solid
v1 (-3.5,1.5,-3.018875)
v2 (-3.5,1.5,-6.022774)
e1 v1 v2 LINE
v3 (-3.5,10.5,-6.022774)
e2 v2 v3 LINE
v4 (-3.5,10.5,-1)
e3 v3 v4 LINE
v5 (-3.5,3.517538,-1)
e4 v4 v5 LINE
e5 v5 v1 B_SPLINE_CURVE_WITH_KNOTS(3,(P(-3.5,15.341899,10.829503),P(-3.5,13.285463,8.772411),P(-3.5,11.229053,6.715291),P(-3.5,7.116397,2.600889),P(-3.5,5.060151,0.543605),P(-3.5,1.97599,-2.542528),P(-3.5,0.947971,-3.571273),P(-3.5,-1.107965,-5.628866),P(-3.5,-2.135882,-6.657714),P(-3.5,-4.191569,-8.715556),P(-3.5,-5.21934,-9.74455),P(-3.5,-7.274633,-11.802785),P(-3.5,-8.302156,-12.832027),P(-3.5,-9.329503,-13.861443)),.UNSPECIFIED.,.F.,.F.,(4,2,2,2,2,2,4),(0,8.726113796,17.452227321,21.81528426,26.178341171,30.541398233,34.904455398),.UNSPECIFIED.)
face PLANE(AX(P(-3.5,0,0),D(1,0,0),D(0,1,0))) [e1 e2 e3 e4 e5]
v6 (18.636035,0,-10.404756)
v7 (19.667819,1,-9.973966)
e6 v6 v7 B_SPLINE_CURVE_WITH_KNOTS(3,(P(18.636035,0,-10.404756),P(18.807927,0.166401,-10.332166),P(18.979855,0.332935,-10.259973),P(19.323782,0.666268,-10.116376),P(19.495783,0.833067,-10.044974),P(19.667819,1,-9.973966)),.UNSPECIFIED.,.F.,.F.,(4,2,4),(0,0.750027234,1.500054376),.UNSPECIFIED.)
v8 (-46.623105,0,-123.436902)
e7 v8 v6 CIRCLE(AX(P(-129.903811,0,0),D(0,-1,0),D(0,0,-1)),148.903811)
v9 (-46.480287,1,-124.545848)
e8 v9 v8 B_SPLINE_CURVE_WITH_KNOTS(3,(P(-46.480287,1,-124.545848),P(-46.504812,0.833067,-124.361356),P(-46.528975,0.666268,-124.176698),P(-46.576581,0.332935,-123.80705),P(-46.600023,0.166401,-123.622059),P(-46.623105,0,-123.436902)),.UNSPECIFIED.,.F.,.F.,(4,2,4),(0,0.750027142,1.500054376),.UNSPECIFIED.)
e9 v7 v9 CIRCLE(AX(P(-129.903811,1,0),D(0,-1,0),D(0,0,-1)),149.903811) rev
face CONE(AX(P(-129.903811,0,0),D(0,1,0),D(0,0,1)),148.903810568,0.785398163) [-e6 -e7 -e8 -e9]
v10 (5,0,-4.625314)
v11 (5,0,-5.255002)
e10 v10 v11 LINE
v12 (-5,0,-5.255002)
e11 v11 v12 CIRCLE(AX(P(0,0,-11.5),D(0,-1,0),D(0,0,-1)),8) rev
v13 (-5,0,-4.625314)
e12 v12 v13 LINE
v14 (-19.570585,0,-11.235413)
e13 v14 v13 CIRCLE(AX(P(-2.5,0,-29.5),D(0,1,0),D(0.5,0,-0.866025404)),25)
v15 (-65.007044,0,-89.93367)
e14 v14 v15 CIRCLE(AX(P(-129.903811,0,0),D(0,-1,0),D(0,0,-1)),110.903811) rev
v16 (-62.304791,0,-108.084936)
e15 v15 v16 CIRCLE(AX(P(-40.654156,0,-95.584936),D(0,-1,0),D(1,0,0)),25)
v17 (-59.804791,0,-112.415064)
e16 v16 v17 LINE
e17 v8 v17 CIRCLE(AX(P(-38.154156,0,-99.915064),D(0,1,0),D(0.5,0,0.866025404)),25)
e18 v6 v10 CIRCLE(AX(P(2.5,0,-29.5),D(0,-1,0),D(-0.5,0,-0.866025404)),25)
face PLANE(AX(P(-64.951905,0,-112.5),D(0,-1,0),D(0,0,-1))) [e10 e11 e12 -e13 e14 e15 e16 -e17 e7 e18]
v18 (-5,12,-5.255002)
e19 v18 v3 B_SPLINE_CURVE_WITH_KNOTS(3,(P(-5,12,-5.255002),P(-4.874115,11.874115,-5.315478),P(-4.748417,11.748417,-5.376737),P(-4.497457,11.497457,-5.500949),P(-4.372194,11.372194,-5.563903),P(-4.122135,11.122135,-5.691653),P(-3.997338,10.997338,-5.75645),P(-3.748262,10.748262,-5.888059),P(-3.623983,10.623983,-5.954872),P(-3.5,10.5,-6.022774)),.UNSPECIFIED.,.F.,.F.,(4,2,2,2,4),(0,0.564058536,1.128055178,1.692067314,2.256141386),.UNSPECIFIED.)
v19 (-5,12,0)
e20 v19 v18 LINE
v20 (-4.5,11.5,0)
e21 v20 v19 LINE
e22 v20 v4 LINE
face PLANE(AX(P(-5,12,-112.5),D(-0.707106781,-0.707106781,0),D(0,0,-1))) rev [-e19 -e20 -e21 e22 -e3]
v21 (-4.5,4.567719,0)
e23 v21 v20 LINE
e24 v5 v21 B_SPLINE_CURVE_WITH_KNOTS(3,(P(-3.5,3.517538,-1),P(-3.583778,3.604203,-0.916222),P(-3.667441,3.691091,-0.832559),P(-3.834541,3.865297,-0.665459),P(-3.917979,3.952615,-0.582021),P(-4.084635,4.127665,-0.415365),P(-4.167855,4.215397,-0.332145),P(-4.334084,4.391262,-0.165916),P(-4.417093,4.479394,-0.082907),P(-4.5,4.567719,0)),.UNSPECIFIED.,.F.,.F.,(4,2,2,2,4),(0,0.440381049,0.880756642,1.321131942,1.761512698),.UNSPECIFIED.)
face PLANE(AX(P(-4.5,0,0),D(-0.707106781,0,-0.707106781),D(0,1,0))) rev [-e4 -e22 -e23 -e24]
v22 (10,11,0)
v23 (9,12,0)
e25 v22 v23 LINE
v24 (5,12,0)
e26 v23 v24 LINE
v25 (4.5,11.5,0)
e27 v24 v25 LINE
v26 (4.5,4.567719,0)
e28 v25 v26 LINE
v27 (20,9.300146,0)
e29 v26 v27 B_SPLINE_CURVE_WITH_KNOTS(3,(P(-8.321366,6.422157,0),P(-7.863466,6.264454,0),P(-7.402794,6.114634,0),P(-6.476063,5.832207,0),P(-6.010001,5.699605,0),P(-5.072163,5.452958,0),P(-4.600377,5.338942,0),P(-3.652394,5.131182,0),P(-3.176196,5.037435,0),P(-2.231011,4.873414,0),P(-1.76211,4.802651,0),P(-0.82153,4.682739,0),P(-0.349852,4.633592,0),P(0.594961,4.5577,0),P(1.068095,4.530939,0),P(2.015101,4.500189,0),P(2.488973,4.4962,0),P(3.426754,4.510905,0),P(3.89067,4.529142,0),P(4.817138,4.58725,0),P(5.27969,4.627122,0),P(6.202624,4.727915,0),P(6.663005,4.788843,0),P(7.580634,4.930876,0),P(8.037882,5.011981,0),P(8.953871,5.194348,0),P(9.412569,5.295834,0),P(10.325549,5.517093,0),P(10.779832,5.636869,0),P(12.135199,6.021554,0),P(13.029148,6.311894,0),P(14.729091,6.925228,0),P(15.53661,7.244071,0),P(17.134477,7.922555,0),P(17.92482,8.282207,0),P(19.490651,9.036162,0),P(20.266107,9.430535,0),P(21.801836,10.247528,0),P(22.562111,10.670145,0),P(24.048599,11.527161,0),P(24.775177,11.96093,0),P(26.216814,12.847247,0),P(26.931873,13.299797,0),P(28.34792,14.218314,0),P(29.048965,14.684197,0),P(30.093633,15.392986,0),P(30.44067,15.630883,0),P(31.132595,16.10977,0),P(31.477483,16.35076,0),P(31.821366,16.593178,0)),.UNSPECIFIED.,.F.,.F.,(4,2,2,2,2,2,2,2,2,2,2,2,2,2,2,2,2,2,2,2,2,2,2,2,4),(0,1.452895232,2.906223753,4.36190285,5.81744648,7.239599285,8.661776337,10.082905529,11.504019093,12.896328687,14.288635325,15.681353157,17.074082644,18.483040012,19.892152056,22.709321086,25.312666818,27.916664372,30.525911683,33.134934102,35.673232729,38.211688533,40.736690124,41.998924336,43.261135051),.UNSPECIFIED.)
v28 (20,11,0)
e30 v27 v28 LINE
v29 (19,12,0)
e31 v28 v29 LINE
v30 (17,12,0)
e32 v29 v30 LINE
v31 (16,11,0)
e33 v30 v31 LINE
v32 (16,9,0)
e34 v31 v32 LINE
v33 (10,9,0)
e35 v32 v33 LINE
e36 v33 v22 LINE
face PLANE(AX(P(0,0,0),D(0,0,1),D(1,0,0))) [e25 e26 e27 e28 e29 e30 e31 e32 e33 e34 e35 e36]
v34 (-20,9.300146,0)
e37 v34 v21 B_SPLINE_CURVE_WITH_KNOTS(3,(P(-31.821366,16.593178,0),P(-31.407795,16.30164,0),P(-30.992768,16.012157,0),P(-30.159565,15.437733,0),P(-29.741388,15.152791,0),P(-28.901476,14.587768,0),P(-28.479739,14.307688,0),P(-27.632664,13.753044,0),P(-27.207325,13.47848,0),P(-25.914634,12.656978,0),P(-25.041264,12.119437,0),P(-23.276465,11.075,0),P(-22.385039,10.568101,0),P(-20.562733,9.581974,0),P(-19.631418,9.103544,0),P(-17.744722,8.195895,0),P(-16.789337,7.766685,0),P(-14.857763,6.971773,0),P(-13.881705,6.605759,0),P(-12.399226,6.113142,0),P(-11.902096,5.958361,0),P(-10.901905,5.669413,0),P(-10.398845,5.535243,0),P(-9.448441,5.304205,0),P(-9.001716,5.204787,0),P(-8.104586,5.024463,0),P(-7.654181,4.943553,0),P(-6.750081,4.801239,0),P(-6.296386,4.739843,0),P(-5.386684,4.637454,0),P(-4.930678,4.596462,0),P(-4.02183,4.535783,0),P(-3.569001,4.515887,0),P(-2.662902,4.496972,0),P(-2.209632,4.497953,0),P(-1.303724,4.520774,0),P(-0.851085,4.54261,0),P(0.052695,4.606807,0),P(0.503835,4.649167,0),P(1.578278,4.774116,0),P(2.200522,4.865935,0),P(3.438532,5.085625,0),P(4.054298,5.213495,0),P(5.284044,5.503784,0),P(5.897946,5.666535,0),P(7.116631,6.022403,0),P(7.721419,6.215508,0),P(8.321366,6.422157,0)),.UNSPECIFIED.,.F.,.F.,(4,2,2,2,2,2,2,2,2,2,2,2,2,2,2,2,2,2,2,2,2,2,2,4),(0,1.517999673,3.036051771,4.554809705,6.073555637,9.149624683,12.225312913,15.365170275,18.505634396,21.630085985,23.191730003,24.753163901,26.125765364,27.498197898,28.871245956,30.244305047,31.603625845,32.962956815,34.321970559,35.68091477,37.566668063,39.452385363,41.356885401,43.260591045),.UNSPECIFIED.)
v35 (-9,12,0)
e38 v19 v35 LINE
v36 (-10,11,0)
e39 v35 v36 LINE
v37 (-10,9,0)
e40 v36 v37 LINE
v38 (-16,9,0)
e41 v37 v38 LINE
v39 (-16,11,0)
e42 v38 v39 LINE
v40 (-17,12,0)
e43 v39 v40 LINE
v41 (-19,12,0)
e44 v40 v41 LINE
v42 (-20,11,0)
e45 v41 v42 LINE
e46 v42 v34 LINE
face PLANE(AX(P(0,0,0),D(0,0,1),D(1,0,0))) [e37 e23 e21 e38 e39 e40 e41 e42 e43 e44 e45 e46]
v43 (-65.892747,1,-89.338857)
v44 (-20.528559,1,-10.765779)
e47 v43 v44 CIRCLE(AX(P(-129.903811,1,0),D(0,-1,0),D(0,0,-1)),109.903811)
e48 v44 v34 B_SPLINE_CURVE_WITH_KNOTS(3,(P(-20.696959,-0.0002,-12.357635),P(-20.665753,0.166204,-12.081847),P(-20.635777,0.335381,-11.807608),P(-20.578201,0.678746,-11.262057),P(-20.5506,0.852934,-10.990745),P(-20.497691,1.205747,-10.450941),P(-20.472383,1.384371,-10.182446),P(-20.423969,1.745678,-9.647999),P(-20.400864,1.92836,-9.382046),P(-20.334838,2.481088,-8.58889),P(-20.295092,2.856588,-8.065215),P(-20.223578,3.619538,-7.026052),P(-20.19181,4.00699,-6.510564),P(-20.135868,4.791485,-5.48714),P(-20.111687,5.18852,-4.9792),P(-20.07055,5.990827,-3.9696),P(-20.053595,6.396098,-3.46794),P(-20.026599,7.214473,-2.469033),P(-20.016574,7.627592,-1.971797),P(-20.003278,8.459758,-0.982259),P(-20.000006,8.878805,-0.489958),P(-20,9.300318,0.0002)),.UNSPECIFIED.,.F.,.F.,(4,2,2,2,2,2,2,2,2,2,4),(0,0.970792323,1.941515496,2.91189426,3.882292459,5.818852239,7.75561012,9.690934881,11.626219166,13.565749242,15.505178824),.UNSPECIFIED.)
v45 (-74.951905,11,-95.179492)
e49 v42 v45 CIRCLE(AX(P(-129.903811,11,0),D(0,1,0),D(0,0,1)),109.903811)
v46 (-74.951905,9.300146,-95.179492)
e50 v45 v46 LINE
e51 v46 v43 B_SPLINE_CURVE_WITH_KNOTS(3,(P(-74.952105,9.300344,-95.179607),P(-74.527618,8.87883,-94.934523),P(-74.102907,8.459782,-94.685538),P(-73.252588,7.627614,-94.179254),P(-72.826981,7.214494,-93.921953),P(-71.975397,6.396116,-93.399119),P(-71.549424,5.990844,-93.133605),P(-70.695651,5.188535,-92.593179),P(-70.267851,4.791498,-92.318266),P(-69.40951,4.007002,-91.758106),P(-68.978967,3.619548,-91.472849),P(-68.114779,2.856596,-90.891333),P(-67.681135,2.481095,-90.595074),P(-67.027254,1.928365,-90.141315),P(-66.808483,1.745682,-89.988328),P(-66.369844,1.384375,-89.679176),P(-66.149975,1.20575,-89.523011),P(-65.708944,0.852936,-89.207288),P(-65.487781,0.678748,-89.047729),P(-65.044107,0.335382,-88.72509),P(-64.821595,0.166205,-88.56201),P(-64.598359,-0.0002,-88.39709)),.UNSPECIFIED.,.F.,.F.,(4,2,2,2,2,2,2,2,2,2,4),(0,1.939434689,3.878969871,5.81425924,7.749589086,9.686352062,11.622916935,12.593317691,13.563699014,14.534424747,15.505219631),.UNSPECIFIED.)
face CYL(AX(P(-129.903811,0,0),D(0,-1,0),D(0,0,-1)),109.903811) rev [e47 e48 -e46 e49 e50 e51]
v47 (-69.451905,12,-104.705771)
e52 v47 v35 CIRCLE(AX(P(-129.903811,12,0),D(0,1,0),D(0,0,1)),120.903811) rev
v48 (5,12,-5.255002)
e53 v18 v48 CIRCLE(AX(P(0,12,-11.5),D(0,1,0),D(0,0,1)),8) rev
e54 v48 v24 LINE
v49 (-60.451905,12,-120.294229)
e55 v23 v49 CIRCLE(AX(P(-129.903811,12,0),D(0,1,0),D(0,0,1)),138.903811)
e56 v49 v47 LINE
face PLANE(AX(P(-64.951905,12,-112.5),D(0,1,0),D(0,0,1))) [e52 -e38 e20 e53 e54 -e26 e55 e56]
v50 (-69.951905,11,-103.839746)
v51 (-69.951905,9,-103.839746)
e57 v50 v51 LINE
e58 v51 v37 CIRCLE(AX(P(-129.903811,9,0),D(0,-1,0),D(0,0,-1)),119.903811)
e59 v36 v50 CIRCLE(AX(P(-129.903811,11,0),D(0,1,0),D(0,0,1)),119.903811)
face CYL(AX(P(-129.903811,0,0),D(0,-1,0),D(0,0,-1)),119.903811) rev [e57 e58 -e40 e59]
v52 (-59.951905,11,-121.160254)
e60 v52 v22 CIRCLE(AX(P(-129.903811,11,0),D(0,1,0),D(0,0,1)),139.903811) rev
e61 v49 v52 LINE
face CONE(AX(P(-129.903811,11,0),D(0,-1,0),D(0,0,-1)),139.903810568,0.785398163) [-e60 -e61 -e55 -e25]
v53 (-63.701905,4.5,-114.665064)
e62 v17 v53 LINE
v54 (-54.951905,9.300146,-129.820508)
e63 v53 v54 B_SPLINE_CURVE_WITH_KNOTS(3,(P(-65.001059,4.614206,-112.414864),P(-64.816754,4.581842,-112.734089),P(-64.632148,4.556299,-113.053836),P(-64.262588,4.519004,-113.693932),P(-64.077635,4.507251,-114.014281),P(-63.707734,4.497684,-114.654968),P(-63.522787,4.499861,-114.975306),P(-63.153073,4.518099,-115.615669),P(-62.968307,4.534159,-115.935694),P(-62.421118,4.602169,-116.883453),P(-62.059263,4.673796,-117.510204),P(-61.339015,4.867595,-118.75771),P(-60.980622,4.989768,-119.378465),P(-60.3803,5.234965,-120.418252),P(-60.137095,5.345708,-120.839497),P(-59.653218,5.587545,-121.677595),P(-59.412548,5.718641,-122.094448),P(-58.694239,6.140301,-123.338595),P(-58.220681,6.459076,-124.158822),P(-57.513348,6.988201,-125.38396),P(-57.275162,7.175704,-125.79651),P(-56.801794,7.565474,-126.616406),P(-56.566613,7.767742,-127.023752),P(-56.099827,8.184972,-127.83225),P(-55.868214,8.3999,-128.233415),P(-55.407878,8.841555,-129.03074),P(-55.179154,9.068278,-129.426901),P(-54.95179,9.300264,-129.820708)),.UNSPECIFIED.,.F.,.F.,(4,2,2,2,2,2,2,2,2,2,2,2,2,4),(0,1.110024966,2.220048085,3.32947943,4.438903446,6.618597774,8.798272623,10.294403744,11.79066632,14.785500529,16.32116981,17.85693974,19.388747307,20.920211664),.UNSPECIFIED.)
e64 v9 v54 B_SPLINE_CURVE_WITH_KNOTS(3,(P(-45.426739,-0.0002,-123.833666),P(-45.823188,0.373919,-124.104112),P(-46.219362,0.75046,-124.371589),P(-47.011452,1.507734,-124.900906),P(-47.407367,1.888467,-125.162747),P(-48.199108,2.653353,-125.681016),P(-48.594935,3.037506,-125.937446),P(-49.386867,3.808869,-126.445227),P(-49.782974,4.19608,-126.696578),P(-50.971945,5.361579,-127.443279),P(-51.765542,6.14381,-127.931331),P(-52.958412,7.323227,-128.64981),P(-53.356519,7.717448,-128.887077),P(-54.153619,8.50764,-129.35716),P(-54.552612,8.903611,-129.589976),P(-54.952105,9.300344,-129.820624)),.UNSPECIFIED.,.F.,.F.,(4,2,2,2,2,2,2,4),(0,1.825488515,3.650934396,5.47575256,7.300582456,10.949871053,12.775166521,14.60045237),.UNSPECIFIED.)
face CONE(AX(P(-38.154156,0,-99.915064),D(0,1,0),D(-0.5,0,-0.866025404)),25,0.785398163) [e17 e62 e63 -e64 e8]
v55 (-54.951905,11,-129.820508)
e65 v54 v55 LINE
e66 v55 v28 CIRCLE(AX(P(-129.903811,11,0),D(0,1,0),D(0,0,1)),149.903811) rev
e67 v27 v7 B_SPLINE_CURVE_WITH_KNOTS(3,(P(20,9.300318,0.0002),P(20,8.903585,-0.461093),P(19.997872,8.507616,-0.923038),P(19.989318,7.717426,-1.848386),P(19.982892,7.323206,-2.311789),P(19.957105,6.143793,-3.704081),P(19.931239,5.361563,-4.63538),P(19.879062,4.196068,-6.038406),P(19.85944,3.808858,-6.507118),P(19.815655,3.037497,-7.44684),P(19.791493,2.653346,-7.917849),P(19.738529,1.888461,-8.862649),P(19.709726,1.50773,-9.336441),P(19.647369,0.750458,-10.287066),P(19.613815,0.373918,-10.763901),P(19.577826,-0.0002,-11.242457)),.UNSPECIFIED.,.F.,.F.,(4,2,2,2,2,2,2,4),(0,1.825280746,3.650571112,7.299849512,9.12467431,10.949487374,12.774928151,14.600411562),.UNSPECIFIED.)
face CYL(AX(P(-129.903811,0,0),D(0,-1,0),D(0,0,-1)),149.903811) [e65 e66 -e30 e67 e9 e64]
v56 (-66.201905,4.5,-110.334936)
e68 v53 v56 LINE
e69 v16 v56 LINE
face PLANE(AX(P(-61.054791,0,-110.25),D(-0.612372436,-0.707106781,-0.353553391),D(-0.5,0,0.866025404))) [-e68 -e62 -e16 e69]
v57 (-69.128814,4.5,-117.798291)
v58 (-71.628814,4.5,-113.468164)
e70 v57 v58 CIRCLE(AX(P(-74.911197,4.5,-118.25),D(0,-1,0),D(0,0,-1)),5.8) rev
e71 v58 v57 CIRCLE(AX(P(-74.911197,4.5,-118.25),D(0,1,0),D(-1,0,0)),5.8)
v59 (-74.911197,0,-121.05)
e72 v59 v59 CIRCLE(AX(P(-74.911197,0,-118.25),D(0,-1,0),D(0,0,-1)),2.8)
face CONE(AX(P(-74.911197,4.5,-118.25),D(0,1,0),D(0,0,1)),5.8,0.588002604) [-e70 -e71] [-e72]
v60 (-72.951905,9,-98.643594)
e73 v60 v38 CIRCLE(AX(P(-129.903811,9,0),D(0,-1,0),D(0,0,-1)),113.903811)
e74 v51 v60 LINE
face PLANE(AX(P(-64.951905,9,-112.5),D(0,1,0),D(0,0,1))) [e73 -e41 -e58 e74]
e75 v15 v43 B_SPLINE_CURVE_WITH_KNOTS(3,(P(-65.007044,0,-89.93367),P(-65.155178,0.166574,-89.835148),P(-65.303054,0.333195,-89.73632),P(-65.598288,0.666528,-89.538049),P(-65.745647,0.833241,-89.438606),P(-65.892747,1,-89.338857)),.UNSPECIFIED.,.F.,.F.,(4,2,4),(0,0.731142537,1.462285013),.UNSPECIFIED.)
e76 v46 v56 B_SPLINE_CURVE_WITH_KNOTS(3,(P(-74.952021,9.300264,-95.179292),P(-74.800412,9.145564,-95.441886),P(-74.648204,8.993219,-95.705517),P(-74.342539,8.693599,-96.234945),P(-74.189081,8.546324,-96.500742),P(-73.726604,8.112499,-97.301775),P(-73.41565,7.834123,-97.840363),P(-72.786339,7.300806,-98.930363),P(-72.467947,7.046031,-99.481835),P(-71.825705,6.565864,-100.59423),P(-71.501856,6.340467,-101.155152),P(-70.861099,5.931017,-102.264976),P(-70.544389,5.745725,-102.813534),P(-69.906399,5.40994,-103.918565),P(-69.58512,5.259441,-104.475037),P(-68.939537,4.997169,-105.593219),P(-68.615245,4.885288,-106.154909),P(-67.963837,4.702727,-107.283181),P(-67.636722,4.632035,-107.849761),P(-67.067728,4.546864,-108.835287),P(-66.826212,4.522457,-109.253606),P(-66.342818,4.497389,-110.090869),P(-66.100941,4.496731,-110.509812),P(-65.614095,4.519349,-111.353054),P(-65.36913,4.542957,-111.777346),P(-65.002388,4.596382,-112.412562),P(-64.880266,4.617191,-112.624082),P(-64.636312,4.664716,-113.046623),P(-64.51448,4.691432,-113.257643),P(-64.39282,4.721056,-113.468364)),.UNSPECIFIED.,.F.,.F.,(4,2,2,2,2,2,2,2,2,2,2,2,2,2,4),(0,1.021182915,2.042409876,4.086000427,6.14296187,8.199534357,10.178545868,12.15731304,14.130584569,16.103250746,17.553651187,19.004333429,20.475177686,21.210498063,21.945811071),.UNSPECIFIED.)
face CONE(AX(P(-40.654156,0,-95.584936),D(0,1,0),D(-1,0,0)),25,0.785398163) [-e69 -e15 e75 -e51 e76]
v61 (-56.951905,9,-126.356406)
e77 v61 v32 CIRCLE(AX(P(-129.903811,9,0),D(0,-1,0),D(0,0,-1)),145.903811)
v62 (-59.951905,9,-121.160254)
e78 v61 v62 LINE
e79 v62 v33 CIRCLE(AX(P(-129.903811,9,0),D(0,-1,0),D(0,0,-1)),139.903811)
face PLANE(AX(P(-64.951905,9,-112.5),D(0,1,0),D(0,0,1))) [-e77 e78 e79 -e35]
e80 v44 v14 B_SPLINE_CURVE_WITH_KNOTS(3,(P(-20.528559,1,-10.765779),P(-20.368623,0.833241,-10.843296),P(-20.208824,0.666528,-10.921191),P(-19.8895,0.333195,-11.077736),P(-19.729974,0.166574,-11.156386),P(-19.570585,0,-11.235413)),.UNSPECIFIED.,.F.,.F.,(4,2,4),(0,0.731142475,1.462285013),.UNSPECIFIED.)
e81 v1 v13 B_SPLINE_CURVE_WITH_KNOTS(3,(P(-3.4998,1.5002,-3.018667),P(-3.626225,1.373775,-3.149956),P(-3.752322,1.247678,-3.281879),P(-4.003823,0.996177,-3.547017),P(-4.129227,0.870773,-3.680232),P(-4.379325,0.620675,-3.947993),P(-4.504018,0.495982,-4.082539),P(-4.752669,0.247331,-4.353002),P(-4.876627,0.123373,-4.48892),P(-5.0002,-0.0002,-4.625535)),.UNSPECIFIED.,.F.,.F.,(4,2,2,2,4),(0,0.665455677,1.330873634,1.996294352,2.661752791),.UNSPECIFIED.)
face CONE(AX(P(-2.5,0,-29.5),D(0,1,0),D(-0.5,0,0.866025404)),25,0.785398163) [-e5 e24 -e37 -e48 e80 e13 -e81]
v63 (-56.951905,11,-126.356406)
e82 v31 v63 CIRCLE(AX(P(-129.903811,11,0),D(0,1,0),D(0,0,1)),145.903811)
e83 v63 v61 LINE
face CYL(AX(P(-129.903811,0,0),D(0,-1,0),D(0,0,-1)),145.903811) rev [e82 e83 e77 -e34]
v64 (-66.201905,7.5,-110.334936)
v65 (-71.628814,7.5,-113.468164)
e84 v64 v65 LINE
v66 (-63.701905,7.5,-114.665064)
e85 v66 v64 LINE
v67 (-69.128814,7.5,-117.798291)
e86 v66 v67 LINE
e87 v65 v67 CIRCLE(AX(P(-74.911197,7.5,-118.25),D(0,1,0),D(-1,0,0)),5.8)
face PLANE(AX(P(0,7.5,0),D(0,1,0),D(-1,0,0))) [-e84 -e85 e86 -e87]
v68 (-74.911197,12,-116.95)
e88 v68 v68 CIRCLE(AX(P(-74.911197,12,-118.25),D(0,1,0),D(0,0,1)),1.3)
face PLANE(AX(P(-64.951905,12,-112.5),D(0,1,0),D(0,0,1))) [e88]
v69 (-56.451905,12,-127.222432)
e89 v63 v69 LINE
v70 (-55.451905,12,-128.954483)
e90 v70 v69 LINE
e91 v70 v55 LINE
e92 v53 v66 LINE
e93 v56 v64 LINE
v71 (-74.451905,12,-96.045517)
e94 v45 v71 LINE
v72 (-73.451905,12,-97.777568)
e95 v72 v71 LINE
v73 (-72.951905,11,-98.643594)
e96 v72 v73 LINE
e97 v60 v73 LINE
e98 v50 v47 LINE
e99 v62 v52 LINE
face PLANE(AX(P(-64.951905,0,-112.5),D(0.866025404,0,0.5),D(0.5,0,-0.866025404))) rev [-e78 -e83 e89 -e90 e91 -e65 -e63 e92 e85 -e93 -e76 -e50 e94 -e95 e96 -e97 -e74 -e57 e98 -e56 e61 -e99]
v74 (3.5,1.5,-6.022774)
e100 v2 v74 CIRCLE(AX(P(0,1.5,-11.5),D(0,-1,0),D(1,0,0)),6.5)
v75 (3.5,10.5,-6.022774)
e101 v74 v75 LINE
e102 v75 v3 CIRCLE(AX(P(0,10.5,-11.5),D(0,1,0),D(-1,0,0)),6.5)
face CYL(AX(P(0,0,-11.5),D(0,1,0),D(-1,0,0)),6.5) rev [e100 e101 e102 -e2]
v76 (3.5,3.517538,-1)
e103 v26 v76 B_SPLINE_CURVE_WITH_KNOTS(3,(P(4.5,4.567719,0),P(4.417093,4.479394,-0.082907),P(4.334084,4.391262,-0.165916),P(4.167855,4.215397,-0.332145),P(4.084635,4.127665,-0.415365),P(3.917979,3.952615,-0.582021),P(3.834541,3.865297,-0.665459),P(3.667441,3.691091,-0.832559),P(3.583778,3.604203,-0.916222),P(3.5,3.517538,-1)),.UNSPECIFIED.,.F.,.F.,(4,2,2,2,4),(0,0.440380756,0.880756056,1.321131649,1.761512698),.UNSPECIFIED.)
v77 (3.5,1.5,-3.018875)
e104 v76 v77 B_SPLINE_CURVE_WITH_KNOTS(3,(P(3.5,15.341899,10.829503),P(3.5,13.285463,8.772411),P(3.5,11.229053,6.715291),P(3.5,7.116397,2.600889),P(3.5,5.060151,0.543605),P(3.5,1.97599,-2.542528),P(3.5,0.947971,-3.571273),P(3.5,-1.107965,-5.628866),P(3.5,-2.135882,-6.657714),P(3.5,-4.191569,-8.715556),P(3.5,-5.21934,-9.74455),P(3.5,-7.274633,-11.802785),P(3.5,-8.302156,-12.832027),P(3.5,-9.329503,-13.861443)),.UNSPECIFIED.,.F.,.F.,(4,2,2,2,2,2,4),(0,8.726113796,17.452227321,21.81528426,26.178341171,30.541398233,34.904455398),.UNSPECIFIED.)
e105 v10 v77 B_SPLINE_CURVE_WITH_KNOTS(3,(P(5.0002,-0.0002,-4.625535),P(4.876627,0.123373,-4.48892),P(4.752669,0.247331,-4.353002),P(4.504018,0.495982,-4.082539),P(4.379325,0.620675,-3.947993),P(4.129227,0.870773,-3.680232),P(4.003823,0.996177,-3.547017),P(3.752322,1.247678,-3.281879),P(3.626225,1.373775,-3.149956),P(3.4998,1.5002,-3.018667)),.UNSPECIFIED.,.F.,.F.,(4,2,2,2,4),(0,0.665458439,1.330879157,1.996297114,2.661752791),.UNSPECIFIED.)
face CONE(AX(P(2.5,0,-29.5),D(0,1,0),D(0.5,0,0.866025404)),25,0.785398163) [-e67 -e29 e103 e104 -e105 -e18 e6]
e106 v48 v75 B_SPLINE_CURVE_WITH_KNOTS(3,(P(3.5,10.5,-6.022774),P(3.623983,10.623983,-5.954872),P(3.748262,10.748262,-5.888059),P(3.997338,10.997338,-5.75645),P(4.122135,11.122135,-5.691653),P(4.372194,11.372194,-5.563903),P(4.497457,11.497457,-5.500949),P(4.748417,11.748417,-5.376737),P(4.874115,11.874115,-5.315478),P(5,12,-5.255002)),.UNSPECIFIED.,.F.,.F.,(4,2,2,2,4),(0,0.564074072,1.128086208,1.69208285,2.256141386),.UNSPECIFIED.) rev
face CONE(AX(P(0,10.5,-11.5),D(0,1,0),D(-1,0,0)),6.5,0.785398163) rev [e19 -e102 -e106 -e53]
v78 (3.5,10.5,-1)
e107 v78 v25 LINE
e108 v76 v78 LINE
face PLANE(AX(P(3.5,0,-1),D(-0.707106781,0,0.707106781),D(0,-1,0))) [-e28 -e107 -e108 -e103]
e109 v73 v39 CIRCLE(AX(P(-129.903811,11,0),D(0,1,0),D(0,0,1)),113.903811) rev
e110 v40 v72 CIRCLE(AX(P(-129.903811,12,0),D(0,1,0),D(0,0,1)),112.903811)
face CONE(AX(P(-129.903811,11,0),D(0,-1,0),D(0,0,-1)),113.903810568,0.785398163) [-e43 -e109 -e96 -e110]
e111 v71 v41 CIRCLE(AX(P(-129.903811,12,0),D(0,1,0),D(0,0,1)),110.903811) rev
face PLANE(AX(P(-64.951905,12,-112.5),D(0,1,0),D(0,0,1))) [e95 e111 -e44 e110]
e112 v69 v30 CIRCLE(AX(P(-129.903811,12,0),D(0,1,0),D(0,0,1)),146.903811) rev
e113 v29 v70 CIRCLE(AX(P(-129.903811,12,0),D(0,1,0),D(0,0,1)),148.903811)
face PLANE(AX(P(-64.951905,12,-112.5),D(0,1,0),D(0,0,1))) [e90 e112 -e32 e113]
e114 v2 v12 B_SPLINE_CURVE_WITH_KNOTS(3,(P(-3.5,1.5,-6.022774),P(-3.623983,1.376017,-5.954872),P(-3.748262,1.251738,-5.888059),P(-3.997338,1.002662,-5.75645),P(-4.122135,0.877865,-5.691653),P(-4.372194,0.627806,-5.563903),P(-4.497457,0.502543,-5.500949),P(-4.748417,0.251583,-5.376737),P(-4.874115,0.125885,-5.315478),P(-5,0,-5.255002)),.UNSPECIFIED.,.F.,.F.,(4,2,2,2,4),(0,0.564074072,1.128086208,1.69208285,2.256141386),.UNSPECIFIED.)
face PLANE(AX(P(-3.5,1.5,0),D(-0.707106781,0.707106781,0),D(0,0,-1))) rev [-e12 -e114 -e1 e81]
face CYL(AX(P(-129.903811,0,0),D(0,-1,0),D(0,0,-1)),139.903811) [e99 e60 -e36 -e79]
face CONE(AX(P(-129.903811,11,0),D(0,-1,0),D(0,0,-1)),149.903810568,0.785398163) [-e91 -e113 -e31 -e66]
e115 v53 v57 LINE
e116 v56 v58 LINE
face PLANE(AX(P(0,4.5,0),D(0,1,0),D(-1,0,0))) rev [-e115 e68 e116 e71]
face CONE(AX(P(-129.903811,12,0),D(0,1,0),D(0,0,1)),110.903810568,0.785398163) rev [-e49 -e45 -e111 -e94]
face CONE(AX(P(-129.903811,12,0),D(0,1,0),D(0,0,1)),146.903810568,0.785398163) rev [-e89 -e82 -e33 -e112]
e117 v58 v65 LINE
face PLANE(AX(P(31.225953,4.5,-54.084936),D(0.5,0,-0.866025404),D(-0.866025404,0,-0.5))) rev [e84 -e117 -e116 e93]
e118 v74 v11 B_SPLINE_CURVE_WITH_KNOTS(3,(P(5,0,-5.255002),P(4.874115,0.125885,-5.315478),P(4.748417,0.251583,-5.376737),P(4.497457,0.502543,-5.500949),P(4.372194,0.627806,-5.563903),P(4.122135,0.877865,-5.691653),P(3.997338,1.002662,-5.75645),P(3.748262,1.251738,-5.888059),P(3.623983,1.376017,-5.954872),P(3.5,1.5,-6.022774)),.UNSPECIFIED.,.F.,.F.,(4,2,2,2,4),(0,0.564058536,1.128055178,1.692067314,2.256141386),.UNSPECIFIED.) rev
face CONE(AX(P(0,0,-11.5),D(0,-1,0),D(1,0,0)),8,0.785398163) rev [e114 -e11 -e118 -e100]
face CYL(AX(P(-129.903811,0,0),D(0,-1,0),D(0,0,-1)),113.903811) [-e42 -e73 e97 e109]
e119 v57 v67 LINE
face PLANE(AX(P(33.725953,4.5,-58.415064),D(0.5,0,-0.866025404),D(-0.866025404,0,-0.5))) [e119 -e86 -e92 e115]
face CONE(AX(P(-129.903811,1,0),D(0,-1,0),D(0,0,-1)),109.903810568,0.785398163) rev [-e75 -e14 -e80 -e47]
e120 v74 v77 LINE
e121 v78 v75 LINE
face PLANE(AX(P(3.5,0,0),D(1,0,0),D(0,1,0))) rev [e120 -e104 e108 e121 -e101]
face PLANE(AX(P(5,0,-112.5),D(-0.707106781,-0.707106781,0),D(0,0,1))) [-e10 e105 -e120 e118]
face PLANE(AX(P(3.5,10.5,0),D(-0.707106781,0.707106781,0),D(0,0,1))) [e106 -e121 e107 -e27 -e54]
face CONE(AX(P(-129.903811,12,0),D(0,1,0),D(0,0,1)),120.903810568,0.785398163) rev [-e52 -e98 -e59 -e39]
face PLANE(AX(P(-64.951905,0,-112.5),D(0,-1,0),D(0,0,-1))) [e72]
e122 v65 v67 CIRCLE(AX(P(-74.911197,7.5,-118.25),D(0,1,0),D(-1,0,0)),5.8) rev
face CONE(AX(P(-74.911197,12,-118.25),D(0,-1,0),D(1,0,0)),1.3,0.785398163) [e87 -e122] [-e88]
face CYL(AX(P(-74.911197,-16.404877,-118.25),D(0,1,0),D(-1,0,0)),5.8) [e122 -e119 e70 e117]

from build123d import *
from build123d.topology import SkipClean

# Parameters (mm, degrees)
REVOLVE1_ANGLE       = 60
CUT_EXTRUDE1_DEPTH   = 151.383351548
BOSS_EXTRUDE1_DEPTH  = 12
BOSS_EXTRUDE2_DEPTH  = 7.5
CUT_EXTRUDE2_DEPTH   = 4.5
CHAMFER2_SIZE        = 4.5
CHAMFER5_SIZE        = 4.5
CHAMFER5_SIZE_2      = 3
CHAMFER3_SIZE        = 1.5
CUT_REVOLVE1_ANGLE   = 90
CHAMFER4_SIZE        = 4.5
MIRROR4_COPY_1_ANGLE = 90
CHAMFER1_SIZE        = 1


# Some blends are built 0.0001 mm under size
with BuildPart() as part:
    # Sketch2 → Revolve1 (revolve)
    with BuildSketch(Plane.XY):
        Polygon((-16, 12), (-20, 12), (-20, 0), (20, 0), (20, 12), (16, 12), (16, 9), (10, 9), (10, 12), (-10, 12), (-10, 9), (-16, 9), align=None)
    revolve(axis=Axis((-129.903810568, 0, 0), (0, 1, 0)), revolution_arc=REVOLVE1_ANGLE)

    # Sketch3 → Cut-Extrude1 (cut, through all)
    with BuildSketch(Plane(origin=(0, 12, 0), x_dir=(1, 0, 0), z_dir=(0, 1, 0))):
        with BuildLine():
            ThreePointArc((6.5, 11.5), (-3.122498999, 17.200877125), (-3.5, 6.022774425))
            Line((-3.5, 6.022774425), (-3.5, 11.5))
            Line((-3.5, 11.5), (3.5, 11.5))
            Line((3.5, 11.5), (3.5, 6.022774425))
            ThreePointArc((3.5, 6.022774425), (5.700877125, 8.377501001), (6.5, 11.5))
        make_face()
        with BuildLine():
            Line((-3.5, 11.5), (-3.5, 6.022774425))
            ThreePointArc((-3.5, 6.022774425), (0, 5), (3.5, 6.022774425))
            Line((3.5, 6.022774425), (3.5, 11.5))
            Line((3.5, 11.5), (-3.5, 11.5))
        make_face()
        with BuildLine():
            Line((-3.5, 6.022774425), (-3.5, 0))
            Line((-3.5, 0), (3.5, 0))
            Line((3.5, 0), (3.5, 6.022774425))
            ThreePointArc((3.5, 6.022774425), (0, 5), (-3.5, 6.022774425))
        make_face()
    extrude(amount=-CUT_EXTRUDE1_DEPTH, mode=Mode.SUBTRACT)



with BuildPart() as body_2:
    # Sketch4 → Boss-Extrude1 (new body)
    with BuildSketch(Plane(origin=(0, 12, 0), x_dir=(1, 0, 0), z_dir=(0, 1, 0))):
        with BuildLine():
            ThreePointArc((-71.628813948, 113.468163669), (-69.888250085, 115.35), (-69.128813948, 117.798290688))
            Line((-69.128813948, 117.798290688), (-73.661197427, 120.415063509))
            Line((-73.661197427, 120.415063509), (-76.161197427, 116.084936491))
            Line((-76.161197427, 116.084936491), (-71.628813948, 113.468163669))
        make_face()
        with BuildLine():
            Line((-73.661197427, 120.415063509), (-69.128813948, 117.798290688))
            ThreePointArc((-69.128813948, 117.798290688), (-69.115603231, 118.023973649), (-69.111197427, 118.25))
            ThreePointArc((-69.111197427, 118.25), (-80.043342407, 120.952052537), (-71.628813948, 113.468163669))
            Line((-71.628813948, 113.468163669), (-76.161197427, 116.084936491))
            Line((-76.161197427, 116.084936491), (-73.661197427, 120.415063509))
        make_face()
    extrude(amount=-BOSS_EXTRUDE1_DEPTH)


with BuildPart() as part_1:
    add(part.part)

    add(body_2.part)  # Boss-Extrude2 merges body 2
    # Sketch4<3> → Boss-Extrude2 (add)
    with BuildSketch(Plane(origin=(0, 12, 0), x_dir=(1, 0, 0), z_dir=(0, 1, 0))):
        with BuildLine():
            Line((-66.201905284, 110.334936491), (-63.701905284, 114.665063509))
            Line((-63.701905284, 114.665063509), (-69.128813948, 117.798290688))
            ThreePointArc((-69.128813948, 117.798290688), (-69.888250085, 115.35), (-71.628813948, 113.468163669))
            Line((-71.628813948, 113.468163669), (-66.201905284, 110.334936491))
        make_face()
    extrude(amount=-BOSS_EXTRUDE2_DEPTH)

    # Sketch4<5> → Cut-Extrude2 (cut)
    with SkipClean():  # the faces are left unmerged after this step: merging them gives an invalid solid
        with BuildSketch(Plane(origin=(0, 12, 0), x_dir=(1, 0, 0), z_dir=(0, 1, 0))):
            with BuildLine():
                Line((-66.201905284, 110.334936491), (-63.701905284, 114.665063509))
                Line((-63.701905284, 114.665063509), (-69.128813948, 117.798290688))
                ThreePointArc((-69.128813948, 117.798290688), (-69.888250085, 115.35), (-71.628813948, 113.468163669))
                Line((-71.628813948, 113.468163669), (-66.201905284, 110.334936491))
            make_face()
        extrude(amount=-CUT_EXTRUDE2_DEPTH, mode=Mode.SUBTRACT)

    # Chamfer2
    chamfer2_edges = [part_1.edges().sort_by_distance(p)[0] for p in [
        (-79.934144769, 12, -121.15),
    ]]
    chamfer(chamfer2_edges, length=CHAMFER2_SIZE - 0.0001)  # a hair under: the kernel refuses the full size

    # Chamfer5
    # the kernel refuses this chamfer: 4.5, 3 mm, written as the material it takes off along each edge
    with BuildSketch(Plane(origin=(-74.911197427, 0, -118.25), x_dir=(0.5659281860209275, 1.3089718800099638e-15, 0.8244545398425934), z_dir=(-0.8244545398425934, -1.906934193520804e-15, 0.5659281860209275))) as chamfer5_piece_1:
        Polygon((5.8, CHAMFER5_SIZE), (5.8 - CHAMFER5_SIZE_2, 0), (5.8, 0), align=None)
    revolve(axis=Axis((-74.911197427, 0, -118.25), (0, 1, 0)), mode=Mode.SUBTRACT)

    # Chamfer3
    chamfer3_edges = [part_1.edges().sort_by_distance(p)[0] for p in [
        (0, 0, -18),
        (3.5, 0, -3.011387212),
        (-3.5, 12, -3.011387212),
        (-3.5, 0, -3.011387212),
        (0, 12, -18),
        (3.5, 12, -3.011387212),
    ]]
    chamfer(chamfer3_edges, length=CHAMFER3_SIZE)

    # Sketch17 → Cut-Revolve1 (revolve, cut)
    with BuildSketch(Plane(origin=(31.225952642, 0, -54.084936491), x_dir=(0.8660254037844438, 0, 0.49999999999999123), z_dir=(-0.49999999999999123, -1.1564823173178522e-15, 0.8660254037844438))):
        Polygon((-118.766454357, 10.766454357), (-118.766454357, 0), (-108, 0), align=None)
    cut_revolve1 = revolve(axis=Axis((-40.654155872, -1.265151723, -95.584936491), (0, 1, 0)), revolution_arc=CUT_REVOLVE1_ANGLE, mode=Mode.SUBTRACT)

    # Mirror1: Cut-Revolve1 across plane
    add(cut_revolve1.mirror(Plane(origin=(32.475952642, 0, -56.25), x_dir=(0.8660254037844437, 2.0030861316495613e-15, 0.4999999999999914), z_dir=(-0.49999999999999156, -1.1564823173178542e-15, 0.8660254037844436))), mode=Mode.SUBTRACT)

    # Chamfer4
    chamfer4_edges = [part_1.edges().sort_by_distance(p)[0] for p in [
        (-64.951905284, 0, -112.5),
    ]]
    chamfer(chamfer4_edges, length=CHAMFER4_SIZE - 0.0001)  # a hair under: the kernel refuses the full size

    # Mirror4: Cut-Revolve1 across plane
    add(cut_revolve1.mirror(Plane(origin=(-32.475952642, 0, -56.25), x_dir=(-0.8660254037844385, -2.0030861316495455e-15, 0.5000000000000006), z_dir=(-0.5000000000000009, -1.1564823173178735e-15, -0.8660254037844383))), mode=Mode.SUBTRACT)

    # Mirror4 copy 1 sketch → Mirror4 copy 1 (revolve, cut)
    with BuildSketch(Plane(origin=(2.5, 0, -112.5), x_dir=(0, 0, -1), z_dir=(1, 0, 0))):
        Polygon((-118.766454357, 10.766454357), (-118.766454357, 0), (-108, 0), align=None)
    revolve(axis=Axis((2.5, -1.265151723, -29.5), (0, 1, 0)), revolution_arc=MIRROR4_COPY_1_ANGLE, mode=Mode.SUBTRACT)

    # Chamfer1
    chamfer1_edges = [part_1.edges().sort_by_distance(p)[0] for p in [
        (-34.724318643, 0, -54.951905284),
        (-0.083302492, 0, -74.951905284),
        (-3.5, 7.508472143, 0),
        (3.5, 7.508472143, 0),
        (-31.260217028, 12, -56.951905284),
        (-26.064064606, 12, -59.951905284),
        (-8.74355653, 12, -69.951905284),
        (-3.547404107, 12, -72.951905284),
        (-0.083302492, 12, -74.951905284),
        (-34.724318643, 12, -54.951905284),
    ]]
    chamfer(chamfer1_edges, length=CHAMFER1_SIZE)


solid = part_1.part
